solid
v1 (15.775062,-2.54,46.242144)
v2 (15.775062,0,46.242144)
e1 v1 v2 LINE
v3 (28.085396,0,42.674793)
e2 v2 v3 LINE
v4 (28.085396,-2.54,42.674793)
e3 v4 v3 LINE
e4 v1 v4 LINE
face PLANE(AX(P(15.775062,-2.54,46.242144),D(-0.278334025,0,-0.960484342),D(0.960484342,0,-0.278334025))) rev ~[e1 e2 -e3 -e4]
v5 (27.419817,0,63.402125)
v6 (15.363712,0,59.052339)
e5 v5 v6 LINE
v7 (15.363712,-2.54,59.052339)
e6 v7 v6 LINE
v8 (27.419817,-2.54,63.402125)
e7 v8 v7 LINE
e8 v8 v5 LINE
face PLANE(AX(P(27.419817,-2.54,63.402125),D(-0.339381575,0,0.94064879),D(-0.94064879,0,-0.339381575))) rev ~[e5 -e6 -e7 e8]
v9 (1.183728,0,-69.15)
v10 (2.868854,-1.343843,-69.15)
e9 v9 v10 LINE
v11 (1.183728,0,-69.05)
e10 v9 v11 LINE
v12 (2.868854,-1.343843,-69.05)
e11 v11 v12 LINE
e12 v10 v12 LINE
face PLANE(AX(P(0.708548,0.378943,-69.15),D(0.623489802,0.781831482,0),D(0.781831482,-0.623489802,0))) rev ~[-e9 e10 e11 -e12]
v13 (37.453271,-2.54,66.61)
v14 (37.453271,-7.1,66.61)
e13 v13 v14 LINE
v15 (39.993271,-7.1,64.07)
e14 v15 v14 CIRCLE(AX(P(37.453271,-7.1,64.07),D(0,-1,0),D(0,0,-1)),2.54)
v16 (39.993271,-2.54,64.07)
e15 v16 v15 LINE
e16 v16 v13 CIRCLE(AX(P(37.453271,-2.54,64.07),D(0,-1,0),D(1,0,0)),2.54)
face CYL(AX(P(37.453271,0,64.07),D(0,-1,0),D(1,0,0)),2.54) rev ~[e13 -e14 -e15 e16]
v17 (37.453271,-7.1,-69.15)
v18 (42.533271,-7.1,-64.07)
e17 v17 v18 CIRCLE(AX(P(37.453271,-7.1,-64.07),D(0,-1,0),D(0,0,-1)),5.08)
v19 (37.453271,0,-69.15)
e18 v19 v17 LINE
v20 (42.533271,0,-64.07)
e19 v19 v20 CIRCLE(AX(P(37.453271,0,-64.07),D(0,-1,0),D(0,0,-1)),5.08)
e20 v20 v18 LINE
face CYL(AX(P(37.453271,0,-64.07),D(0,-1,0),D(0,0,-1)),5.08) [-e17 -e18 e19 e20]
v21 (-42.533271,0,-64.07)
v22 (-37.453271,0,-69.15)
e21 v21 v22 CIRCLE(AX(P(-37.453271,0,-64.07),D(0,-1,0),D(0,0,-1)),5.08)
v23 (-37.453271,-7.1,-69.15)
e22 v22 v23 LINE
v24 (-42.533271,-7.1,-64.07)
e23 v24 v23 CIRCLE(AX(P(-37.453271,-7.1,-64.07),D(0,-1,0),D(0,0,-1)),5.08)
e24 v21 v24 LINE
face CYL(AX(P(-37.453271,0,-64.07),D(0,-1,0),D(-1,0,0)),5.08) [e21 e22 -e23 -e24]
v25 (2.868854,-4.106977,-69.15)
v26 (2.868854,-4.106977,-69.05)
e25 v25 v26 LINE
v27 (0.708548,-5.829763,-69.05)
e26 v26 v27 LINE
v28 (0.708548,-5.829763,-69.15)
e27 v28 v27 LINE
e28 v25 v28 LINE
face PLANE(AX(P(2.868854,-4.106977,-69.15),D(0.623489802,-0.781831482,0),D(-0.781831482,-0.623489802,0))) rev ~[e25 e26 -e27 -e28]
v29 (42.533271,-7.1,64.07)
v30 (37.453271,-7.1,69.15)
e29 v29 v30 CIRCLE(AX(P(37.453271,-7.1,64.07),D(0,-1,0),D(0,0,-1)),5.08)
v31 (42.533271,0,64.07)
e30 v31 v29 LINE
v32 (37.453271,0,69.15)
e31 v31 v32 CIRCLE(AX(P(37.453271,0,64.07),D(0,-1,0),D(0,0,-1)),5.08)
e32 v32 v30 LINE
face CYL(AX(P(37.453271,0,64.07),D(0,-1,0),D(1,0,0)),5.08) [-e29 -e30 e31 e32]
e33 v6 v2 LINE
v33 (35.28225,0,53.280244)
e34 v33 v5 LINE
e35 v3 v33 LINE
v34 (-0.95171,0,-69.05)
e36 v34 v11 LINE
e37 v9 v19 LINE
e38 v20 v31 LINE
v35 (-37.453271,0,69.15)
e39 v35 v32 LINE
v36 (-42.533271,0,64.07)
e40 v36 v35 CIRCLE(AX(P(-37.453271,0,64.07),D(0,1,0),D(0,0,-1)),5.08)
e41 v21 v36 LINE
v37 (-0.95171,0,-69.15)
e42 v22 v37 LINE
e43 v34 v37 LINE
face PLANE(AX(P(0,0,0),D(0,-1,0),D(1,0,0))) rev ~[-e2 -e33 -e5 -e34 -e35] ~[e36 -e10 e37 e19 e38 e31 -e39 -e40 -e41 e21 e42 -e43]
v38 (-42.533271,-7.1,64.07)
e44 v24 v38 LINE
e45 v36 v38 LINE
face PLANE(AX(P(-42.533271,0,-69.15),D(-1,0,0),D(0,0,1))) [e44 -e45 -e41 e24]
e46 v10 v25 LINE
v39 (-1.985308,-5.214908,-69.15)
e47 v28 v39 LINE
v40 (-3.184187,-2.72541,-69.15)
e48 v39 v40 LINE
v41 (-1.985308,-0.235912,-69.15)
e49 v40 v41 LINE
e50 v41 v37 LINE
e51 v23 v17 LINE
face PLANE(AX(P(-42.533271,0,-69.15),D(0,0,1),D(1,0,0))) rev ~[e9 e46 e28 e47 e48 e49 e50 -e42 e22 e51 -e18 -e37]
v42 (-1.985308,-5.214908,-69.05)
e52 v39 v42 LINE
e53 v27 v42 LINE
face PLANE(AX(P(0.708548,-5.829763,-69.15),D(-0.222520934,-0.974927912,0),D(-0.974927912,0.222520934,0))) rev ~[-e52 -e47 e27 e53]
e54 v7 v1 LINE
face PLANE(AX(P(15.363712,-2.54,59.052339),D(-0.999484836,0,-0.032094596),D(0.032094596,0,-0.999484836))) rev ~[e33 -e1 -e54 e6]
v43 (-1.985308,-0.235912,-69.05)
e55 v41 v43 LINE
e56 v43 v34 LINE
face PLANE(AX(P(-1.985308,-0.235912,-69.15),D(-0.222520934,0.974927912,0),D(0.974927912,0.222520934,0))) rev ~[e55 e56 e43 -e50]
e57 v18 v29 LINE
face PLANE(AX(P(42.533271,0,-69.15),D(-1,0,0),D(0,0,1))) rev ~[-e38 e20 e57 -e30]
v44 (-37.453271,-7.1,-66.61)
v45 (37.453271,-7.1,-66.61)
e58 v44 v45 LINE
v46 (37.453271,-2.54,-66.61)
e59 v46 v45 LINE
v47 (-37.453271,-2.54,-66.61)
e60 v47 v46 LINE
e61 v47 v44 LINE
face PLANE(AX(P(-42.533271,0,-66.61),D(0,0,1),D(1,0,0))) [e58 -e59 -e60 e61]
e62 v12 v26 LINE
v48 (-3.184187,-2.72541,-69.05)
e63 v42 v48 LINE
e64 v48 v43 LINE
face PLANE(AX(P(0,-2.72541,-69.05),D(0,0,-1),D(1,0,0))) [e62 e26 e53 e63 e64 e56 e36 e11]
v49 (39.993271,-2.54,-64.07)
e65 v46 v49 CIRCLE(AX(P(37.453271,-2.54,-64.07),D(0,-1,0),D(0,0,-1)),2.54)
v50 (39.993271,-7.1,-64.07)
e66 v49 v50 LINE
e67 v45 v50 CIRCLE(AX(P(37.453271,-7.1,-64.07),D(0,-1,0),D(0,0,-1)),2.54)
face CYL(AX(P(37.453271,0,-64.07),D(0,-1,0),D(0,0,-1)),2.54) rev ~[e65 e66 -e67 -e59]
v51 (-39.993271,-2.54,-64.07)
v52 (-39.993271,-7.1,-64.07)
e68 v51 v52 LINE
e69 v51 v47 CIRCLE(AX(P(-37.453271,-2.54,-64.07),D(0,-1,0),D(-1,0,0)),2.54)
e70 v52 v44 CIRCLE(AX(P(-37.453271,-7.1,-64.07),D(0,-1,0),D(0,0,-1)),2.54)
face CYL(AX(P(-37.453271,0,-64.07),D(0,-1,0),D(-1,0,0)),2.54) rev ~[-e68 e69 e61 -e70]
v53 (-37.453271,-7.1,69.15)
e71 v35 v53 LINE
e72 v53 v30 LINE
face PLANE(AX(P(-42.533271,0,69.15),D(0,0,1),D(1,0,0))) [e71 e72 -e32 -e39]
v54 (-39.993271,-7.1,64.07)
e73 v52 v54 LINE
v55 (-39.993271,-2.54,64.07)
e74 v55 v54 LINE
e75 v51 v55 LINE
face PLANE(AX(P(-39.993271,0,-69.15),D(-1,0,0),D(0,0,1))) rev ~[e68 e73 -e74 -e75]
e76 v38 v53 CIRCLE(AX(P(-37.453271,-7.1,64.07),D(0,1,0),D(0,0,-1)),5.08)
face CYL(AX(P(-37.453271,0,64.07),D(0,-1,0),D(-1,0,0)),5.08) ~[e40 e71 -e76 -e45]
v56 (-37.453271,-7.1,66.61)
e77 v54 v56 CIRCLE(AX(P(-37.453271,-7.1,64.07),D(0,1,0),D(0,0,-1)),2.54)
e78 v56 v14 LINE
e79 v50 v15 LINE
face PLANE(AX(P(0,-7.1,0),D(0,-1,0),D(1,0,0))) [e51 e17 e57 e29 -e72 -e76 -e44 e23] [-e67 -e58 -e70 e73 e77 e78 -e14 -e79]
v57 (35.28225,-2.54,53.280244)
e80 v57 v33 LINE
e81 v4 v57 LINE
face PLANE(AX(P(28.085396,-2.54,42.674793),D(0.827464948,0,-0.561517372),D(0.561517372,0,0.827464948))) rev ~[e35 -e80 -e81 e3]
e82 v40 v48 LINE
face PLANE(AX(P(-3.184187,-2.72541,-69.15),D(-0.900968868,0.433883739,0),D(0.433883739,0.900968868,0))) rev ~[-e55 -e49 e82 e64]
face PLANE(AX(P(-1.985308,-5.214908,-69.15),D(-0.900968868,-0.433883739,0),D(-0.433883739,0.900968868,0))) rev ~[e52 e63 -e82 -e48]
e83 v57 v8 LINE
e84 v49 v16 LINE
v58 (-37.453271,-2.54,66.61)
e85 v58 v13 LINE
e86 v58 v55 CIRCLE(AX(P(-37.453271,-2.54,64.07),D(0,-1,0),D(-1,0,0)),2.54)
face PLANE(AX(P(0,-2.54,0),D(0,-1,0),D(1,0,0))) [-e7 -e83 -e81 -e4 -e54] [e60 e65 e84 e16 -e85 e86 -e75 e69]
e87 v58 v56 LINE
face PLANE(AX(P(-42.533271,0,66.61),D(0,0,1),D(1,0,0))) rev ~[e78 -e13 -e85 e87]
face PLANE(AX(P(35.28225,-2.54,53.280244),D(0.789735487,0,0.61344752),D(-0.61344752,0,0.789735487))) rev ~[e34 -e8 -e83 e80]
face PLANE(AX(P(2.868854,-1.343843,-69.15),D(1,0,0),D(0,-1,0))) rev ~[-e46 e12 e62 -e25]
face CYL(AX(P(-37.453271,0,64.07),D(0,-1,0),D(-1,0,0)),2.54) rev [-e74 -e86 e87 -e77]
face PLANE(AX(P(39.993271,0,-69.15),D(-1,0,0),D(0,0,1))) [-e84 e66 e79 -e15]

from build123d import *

# Parameters (mm, degrees)
F0_W     = 85.0665410506
F0_H     = 138.3
F1_DEPTH = 7.1
F2_R     = 5.08
F3_T     = -2.54
F5_DEPTH = 25
F8_DEPTH = 0.1


# Not quite as in the source:
# - a feature of the source that left no trace in its solid (it failed there, or was rolled back) is left out


with BuildPart() as f1:
    # F0 (on Front) → F1 (new body)
    with BuildSketch(Plane.XZ):
        Rectangle(F0_W, F0_H)
    extrude(amount=F1_DEPTH)

    # F2
    f2_edges = [f1.edges().sort_by_distance(p)[0] for p in [
        (42.533271, -3.55, -69.15),
        (-42.533271, -3.55, -69.15),
        (42.533271, -3.55, 69.15),
        (-42.533271, -3.55, 69.15),
    ]]
    fillet(f2_edges, radius=F2_R)

    # F3
    f3_openings = [f1.faces().sort_by_distance(p)[0] for p in [
        (0, -7.1, 0),
    ]]
    offset(amount=F3_T, openings=f3_openings)

    # F4 (on face) → F5 (cut)
    with BuildSketch(Plane.XZ.offset(2.54)):
        Polygon((15.775061698, 46.2421439753), (28.0853956244, 42.6747929635), (35.2822504398, 53.2802441743), (27.4198174015, 63.4021245005), (15.3637117341, 59.0523393613), align=None)
    extrude(amount=-F5_DEPTH, mode=Mode.SUBTRACT)

    # F7 (on face) → F8 (cut)
    with BuildSketch(Plane(origin=(0, 0, -69.15), x_dir=(1, 0, 0), z_dir=(0, 0, -1))):
        Polygon((2.8688537423, 1.343842895), (2.8688537423, 4.1069771897), (0.7085483604, 5.8297632436), (-1.9853083886, 5.2149080197), (-3.1841874281, 2.7254100423), (-1.9853083886, 0.235912065), (0.7085483604, -0.3789431589), align=None)
    extrude(amount=-F8_DEPTH, mode=Mode.SUBTRACT)


solid = f1.part
